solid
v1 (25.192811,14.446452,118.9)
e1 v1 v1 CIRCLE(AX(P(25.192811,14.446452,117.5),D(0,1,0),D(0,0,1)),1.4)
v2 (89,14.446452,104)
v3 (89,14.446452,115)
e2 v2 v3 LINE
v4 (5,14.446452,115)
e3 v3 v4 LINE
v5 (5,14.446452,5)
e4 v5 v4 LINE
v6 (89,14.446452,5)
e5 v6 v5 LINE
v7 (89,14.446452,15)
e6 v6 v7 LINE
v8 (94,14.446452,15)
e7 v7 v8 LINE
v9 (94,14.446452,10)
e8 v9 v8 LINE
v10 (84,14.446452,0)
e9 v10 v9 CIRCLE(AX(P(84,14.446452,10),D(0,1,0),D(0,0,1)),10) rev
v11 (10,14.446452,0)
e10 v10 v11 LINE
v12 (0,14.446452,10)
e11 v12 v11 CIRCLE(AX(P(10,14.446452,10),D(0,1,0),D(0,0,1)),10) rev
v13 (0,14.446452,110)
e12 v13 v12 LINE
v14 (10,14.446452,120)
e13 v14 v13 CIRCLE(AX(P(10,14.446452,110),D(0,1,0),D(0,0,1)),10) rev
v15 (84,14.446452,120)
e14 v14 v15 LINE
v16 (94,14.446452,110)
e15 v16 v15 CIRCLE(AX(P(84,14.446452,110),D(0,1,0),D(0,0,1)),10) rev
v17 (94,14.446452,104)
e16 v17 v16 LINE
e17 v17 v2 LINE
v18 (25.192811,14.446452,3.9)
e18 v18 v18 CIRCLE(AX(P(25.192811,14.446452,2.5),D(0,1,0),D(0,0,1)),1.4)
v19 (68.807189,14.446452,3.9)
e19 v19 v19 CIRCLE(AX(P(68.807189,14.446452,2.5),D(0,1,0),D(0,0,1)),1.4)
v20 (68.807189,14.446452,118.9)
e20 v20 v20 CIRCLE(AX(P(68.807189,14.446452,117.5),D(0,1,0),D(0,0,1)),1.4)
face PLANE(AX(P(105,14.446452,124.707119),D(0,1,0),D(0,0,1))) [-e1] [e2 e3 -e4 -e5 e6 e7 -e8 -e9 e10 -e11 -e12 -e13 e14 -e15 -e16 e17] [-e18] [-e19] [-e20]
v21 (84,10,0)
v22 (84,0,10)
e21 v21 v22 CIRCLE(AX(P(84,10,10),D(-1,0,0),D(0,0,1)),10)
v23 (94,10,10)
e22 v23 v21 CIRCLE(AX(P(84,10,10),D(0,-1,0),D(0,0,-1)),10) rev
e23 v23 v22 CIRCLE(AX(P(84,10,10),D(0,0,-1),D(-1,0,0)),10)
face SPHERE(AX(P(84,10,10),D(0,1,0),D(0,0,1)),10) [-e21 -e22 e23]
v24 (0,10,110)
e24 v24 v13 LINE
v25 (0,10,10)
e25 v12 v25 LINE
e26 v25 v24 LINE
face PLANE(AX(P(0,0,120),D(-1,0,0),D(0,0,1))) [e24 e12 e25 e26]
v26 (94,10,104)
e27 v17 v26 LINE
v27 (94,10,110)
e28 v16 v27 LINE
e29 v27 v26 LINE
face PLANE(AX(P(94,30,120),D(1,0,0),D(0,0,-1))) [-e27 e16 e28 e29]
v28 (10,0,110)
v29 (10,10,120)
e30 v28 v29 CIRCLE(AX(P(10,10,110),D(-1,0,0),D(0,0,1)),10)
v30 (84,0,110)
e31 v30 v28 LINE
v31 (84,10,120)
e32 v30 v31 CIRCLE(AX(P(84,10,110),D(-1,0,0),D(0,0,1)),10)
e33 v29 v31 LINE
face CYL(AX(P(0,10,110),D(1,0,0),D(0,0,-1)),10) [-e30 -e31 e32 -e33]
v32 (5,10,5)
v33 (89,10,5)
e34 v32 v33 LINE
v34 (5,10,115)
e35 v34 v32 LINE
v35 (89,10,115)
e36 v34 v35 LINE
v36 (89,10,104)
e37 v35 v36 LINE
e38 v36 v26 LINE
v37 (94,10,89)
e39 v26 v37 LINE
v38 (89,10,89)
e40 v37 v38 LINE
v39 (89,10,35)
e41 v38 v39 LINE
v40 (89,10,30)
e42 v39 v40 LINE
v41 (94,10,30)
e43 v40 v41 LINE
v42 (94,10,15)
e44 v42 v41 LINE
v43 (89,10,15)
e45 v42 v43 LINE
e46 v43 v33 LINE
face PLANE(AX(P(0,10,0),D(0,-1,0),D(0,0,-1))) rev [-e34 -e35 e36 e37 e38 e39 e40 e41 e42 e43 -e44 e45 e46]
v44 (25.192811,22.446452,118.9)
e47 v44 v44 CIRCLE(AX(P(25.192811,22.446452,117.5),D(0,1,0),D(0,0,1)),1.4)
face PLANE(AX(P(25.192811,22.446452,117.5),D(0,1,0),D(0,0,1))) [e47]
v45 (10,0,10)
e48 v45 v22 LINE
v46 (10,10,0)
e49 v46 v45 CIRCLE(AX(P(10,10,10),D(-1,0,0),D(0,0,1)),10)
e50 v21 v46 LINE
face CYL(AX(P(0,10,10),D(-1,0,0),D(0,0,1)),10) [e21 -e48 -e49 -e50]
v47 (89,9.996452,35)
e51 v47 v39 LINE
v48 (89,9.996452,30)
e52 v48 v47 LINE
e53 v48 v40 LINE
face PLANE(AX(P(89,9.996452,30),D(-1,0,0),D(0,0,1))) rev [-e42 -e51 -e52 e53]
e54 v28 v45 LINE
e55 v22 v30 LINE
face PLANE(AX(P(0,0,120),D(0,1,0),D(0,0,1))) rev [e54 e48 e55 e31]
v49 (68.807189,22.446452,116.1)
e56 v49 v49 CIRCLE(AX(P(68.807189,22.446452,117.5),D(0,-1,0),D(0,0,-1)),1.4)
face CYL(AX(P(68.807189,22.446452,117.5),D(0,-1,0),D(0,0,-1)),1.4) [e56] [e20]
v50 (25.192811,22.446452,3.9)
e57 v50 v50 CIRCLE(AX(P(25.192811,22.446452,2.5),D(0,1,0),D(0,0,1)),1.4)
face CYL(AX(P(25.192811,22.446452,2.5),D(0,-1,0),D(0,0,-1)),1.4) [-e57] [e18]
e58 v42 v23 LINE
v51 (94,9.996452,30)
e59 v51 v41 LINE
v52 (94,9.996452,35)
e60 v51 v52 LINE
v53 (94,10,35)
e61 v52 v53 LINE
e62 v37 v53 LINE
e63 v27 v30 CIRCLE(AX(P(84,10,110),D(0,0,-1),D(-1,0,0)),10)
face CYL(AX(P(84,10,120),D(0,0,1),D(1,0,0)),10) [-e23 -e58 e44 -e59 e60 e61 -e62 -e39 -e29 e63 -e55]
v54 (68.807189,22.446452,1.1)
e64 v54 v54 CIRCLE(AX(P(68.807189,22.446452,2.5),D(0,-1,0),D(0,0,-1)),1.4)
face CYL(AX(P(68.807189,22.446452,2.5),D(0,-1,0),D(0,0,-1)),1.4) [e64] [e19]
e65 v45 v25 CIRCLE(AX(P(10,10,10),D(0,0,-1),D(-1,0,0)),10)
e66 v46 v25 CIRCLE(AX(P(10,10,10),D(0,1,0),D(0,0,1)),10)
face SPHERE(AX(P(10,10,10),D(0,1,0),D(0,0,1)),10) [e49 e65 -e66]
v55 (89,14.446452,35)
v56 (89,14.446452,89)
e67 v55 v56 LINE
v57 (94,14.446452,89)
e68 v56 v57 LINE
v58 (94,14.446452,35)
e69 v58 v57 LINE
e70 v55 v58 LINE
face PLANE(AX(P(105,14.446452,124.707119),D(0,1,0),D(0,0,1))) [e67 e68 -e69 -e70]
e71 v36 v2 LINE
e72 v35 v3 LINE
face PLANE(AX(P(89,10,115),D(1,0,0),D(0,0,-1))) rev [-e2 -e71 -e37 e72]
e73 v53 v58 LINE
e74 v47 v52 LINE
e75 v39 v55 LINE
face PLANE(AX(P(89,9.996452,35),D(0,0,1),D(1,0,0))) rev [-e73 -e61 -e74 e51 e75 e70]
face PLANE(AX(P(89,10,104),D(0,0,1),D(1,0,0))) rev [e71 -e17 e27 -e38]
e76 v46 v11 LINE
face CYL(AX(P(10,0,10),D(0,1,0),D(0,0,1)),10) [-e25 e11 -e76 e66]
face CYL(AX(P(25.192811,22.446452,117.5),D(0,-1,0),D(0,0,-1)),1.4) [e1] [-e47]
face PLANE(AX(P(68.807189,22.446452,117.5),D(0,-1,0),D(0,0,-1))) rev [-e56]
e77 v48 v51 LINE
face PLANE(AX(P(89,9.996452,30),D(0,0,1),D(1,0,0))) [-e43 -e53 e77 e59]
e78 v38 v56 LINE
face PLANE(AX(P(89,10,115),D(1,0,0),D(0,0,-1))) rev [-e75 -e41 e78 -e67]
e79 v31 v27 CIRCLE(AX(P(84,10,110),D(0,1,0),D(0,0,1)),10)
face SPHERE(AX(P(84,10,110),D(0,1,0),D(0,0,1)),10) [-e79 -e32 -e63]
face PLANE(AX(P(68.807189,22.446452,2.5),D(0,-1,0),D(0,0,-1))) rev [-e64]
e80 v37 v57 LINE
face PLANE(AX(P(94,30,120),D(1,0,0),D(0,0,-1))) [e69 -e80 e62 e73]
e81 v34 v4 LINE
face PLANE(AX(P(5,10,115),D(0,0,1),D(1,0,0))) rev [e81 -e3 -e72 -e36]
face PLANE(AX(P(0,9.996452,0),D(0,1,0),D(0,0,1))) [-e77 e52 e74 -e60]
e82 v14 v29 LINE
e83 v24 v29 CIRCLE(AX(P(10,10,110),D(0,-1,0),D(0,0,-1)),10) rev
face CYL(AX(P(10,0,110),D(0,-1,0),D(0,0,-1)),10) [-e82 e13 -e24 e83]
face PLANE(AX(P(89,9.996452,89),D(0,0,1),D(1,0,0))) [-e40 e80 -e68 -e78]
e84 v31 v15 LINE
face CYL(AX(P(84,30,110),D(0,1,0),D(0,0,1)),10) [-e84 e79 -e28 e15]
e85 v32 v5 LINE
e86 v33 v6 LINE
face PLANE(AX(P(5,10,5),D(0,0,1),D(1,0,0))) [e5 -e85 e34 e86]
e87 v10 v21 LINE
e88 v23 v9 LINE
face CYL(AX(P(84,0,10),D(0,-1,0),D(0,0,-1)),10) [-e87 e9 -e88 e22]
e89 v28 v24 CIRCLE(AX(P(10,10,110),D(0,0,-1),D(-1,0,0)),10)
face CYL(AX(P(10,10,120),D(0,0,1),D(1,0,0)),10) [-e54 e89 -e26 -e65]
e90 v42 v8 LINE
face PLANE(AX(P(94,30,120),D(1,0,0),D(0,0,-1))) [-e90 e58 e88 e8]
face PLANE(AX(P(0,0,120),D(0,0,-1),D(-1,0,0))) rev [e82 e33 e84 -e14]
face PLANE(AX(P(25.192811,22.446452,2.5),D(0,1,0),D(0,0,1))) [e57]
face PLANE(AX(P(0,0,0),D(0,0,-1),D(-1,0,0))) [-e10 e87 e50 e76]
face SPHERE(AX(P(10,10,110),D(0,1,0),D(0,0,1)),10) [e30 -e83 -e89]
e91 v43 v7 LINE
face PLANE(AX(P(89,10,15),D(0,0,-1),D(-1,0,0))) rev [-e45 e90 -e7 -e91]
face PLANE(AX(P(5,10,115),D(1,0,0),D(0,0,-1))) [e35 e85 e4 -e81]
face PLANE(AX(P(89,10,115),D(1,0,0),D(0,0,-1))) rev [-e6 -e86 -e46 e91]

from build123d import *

# Parameters (mm, degrees)
SKETCH_1_W           = 94
SKETCH_1_H           = 30
EXTRUDE_2_DEPTH      = 120
SKETCH_2_W           = 84
SKETCH_2_H           = 110
CUT_EXTRUDE_1_DEPTH  = 20
SKETCH_4_W           = 12.8042226
SKETCH_4_H           = 20
CUT_EXTRUDE_5_DEPTH  = 20
SKETCH_9_W           = 17.034378807
SKETCH_9_H           = 15
CUT_EXTRUDE_6_DEPTH  = 20
SKETCH_10_W          = 26
SKETCH_10_H          = 34
EXTRUDE_2_2_DEPTH    = 26
SKETCH_16_R          = 11.5
CUT_EXTRUDE_8_DEPTH  = 126.231871204
FILLET_2_R           = 10
FILLET_3_R           = 10
FILLET_4_R           = 10
SKETCH_20_R          = 1.5
CUT_EXTRUDE_12_DEPTH = 10
SKETCH_21_W          = 28.864787598
SKETCH_21_H          = 27.787348415
CUT_EXTRUDE_13_DEPTH = 40
CUT_EXTRUDE_START    = -50
SKETCH_22_W          = 124.707119116
SKETCH_22_H          = 18.117072108
CUT_EXTRUDE_14_DEPTH = 150
SKETCH_23_R          = 1.4
EXTRUDE_4_DEPTH      = 8
SKETCH_25_W          = 5
SKETCH_25_H          = 5
CUT_EXTRUDE_15_DEPTH = 4.45
SKETCH_28_W          = 5
SKETCH_28_H          = 5
EXTRUDE_5_DEPTH      = 4.45


with BuildPart() as part:
    # 스케치1 → Extrude 2 (new body)
    with BuildSketch(Plane.XY):
        with Locations((47, 15)):
            Rectangle(SKETCH_1_W, SKETCH_1_H)
    extrude(amount=EXTRUDE_2_DEPTH)

    # 스케치2 → 컷-돌출1 (cut)
    with BuildSketch(Plane(origin=(0, 30, 0), x_dir=(1, 0, 0), z_dir=(0, 1, 0))):
        with Locations((47, -60)):
            Rectangle(SKETCH_2_W, SKETCH_2_H)
    extrude(amount=-CUT_EXTRUDE_1_DEPTH, mode=Mode.SUBTRACT)

    # 스케치4 → 컷-돌출5 (cut)
    with BuildSketch(Plane(origin=(0, 30, 0), x_dir=(1, 0, 0), z_dir=(0, 1, 0))):
        with Locations((95.4021113, -94)):
            Rectangle(SKETCH_4_W, SKETCH_4_H)
    extrude(amount=-CUT_EXTRUDE_5_DEPTH, mode=Mode.SUBTRACT)

    # 스케치9 → 컷-돌출6 (cut)
    with BuildSketch(Plane(origin=(0, 30, 0), x_dir=(1, 0, 0), z_dir=(0, 1, 0))):
        with Locations((97.517189403, -22.5)):
            Rectangle(SKETCH_9_W, SKETCH_9_H)
    extrude(amount=-CUT_EXTRUDE_6_DEPTH, mode=Mode.SUBTRACT)

    # 스케치10 → Extrude 2 2 (add)
    with BuildSketch(Plane(origin=(0, 0, 0), x_dir=(-1, 0, 0), z_dir=(0, -1, 0))):
        with Locations((-47, -59.883065639)):
            Rectangle(SKETCH_10_W, SKETCH_10_H)
    extrude(amount=EXTRUDE_2_2_DEPTH)

    # 스케치16 → 컷-돌출8 (cut, through all)
    with BuildSketch(Plane(origin=(0, 0, 42.883065639), x_dir=(-1, 0, 0), z_dir=(0, 0, -1))):
        with Locations((-47, -13)):
            Circle(SKETCH_16_R)
    extrude(amount=-CUT_EXTRUDE_8_DEPTH, mode=Mode.SUBTRACT)

    # 필렛2
    fillet_2_edges = [part.edges().sort_by_distance(p)[0] for p in [
        (0, 15, 0),
    ]]
    fillet(fillet_2_edges, radius=FILLET_2_R)

    # 필렛3
    fillet_3_edges = [part.edges().sort_by_distance(p)[0] for p in [
        (94, 15, 120),
        (0, 15, 120),
        (94, 15, 0),
    ]]
    fillet(fillet_3_edges, radius=FILLET_3_R)

    # 필렛4
    fillet_4_edges = [part.edges().sort_by_distance(p)[0] for p in [
        (47, 0, 0),
        (2.928932188, 0, 2.928932188),
        (0, 0, 60),
        (47, 0, 120),
        (94, 0, 60),
        (91.071067812, 0, 2.928932188),
        (91.071067812, 0, 117.071067812),
        (2.928932188, 0, 117.071067812),
    ]]
    fillet(fillet_4_edges, radius=FILLET_4_R - 0.0001)  # a hair under: the kernel refuses the full size

    # 스케치20 → 컷-돌출12 (cut)
    with BuildSketch(Plane(origin=(0, 30, 0), x_dir=(1, 0, 0), z_dir=(0, 1, 0))):
        with Locations(Location((25.192810861, -2.5, 0), (0, 0, 270))):
            Circle(SKETCH_20_R)
        with Locations(Location((68.807189139, -2.5, 0), (0, 0, 90))):
            Circle(SKETCH_20_R)
        with Locations(Location((25.192810861, -117.5, 0), (0, 0, 270))):
            Circle(SKETCH_20_R)
        with Locations(Location((68.807189139, -117.5, 0), (0, 0, 90))):
            Circle(SKETCH_20_R)
    extrude(amount=-CUT_EXTRUDE_12_DEPTH, mode=Mode.SUBTRACT)

    # 스케치21 → 컷-돌출13 (cut)
    with BuildSketch(Plane.XY.offset(76.883065639)):
        with Locations((48.432393799, -13.893674208)):
            Rectangle(SKETCH_21_W, SKETCH_21_H)
    extrude(amount=-CUT_EXTRUDE_13_DEPTH, mode=Mode.SUBTRACT)

    # 스케치22 → 컷-돌출14 (cut)
    with BuildSketch(Plane(origin=(5, 0, 0), x_dir=(0, 0, -1), z_dir=(1, 0, 0)).offset(CUT_EXTRUDE_START)):
        with Locations((-62.353559558, 23.504988421)):
            Rectangle(SKETCH_22_W, SKETCH_22_H)
    extrude(amount=CUT_EXTRUDE_14_DEPTH, mode=Mode.SUBTRACT)

    # 스케치23 → 보스-돌출4 (add)
    with BuildSketch(Plane(origin=(0, 14.446452367, 0), x_dir=(1, 0, 0), z_dir=(0, 1, 0))):
        with Locations(Location((25.192810861, -117.5, 0), (0, 0, 270))):
            Circle(SKETCH_23_R)
        with Locations(Location((68.807189139, -117.5, 0), (0, 0, 90))):
            Circle(SKETCH_23_R)
        with Locations(Location((25.192810861, -2.5, 0), (0, 0, 270))):
            Circle(SKETCH_23_R)
        with Locations(Location((68.807189139, -2.5, 0), (0, 0, 90))):
            Circle(SKETCH_23_R)
    extrude(amount=EXTRUDE_4_DEPTH)

    # 스케치25 → 컷-돌출15 (cut)
    with BuildSketch(Plane(origin=(0, 14.446452367, 0), x_dir=(1, 0, 0), z_dir=(0, 1, 0))):
        with Locations((91.5, -32.5)):
            Rectangle(SKETCH_25_W, SKETCH_25_H)
    extrude(amount=-CUT_EXTRUDE_15_DEPTH, mode=Mode.SUBTRACT)

    # 스케치28 → 보스-돌출5 (add)
    with BuildSketch(Plane(origin=(0, 14.446452367, 0), x_dir=(1, 0, 0), z_dir=(0, 1, 0))):
        with Locations((91.5, -86.5)):
            Rectangle(SKETCH_28_W, SKETCH_28_H)
    extrude(amount=-EXTRUDE_5_DEPTH)


solid = part.part
